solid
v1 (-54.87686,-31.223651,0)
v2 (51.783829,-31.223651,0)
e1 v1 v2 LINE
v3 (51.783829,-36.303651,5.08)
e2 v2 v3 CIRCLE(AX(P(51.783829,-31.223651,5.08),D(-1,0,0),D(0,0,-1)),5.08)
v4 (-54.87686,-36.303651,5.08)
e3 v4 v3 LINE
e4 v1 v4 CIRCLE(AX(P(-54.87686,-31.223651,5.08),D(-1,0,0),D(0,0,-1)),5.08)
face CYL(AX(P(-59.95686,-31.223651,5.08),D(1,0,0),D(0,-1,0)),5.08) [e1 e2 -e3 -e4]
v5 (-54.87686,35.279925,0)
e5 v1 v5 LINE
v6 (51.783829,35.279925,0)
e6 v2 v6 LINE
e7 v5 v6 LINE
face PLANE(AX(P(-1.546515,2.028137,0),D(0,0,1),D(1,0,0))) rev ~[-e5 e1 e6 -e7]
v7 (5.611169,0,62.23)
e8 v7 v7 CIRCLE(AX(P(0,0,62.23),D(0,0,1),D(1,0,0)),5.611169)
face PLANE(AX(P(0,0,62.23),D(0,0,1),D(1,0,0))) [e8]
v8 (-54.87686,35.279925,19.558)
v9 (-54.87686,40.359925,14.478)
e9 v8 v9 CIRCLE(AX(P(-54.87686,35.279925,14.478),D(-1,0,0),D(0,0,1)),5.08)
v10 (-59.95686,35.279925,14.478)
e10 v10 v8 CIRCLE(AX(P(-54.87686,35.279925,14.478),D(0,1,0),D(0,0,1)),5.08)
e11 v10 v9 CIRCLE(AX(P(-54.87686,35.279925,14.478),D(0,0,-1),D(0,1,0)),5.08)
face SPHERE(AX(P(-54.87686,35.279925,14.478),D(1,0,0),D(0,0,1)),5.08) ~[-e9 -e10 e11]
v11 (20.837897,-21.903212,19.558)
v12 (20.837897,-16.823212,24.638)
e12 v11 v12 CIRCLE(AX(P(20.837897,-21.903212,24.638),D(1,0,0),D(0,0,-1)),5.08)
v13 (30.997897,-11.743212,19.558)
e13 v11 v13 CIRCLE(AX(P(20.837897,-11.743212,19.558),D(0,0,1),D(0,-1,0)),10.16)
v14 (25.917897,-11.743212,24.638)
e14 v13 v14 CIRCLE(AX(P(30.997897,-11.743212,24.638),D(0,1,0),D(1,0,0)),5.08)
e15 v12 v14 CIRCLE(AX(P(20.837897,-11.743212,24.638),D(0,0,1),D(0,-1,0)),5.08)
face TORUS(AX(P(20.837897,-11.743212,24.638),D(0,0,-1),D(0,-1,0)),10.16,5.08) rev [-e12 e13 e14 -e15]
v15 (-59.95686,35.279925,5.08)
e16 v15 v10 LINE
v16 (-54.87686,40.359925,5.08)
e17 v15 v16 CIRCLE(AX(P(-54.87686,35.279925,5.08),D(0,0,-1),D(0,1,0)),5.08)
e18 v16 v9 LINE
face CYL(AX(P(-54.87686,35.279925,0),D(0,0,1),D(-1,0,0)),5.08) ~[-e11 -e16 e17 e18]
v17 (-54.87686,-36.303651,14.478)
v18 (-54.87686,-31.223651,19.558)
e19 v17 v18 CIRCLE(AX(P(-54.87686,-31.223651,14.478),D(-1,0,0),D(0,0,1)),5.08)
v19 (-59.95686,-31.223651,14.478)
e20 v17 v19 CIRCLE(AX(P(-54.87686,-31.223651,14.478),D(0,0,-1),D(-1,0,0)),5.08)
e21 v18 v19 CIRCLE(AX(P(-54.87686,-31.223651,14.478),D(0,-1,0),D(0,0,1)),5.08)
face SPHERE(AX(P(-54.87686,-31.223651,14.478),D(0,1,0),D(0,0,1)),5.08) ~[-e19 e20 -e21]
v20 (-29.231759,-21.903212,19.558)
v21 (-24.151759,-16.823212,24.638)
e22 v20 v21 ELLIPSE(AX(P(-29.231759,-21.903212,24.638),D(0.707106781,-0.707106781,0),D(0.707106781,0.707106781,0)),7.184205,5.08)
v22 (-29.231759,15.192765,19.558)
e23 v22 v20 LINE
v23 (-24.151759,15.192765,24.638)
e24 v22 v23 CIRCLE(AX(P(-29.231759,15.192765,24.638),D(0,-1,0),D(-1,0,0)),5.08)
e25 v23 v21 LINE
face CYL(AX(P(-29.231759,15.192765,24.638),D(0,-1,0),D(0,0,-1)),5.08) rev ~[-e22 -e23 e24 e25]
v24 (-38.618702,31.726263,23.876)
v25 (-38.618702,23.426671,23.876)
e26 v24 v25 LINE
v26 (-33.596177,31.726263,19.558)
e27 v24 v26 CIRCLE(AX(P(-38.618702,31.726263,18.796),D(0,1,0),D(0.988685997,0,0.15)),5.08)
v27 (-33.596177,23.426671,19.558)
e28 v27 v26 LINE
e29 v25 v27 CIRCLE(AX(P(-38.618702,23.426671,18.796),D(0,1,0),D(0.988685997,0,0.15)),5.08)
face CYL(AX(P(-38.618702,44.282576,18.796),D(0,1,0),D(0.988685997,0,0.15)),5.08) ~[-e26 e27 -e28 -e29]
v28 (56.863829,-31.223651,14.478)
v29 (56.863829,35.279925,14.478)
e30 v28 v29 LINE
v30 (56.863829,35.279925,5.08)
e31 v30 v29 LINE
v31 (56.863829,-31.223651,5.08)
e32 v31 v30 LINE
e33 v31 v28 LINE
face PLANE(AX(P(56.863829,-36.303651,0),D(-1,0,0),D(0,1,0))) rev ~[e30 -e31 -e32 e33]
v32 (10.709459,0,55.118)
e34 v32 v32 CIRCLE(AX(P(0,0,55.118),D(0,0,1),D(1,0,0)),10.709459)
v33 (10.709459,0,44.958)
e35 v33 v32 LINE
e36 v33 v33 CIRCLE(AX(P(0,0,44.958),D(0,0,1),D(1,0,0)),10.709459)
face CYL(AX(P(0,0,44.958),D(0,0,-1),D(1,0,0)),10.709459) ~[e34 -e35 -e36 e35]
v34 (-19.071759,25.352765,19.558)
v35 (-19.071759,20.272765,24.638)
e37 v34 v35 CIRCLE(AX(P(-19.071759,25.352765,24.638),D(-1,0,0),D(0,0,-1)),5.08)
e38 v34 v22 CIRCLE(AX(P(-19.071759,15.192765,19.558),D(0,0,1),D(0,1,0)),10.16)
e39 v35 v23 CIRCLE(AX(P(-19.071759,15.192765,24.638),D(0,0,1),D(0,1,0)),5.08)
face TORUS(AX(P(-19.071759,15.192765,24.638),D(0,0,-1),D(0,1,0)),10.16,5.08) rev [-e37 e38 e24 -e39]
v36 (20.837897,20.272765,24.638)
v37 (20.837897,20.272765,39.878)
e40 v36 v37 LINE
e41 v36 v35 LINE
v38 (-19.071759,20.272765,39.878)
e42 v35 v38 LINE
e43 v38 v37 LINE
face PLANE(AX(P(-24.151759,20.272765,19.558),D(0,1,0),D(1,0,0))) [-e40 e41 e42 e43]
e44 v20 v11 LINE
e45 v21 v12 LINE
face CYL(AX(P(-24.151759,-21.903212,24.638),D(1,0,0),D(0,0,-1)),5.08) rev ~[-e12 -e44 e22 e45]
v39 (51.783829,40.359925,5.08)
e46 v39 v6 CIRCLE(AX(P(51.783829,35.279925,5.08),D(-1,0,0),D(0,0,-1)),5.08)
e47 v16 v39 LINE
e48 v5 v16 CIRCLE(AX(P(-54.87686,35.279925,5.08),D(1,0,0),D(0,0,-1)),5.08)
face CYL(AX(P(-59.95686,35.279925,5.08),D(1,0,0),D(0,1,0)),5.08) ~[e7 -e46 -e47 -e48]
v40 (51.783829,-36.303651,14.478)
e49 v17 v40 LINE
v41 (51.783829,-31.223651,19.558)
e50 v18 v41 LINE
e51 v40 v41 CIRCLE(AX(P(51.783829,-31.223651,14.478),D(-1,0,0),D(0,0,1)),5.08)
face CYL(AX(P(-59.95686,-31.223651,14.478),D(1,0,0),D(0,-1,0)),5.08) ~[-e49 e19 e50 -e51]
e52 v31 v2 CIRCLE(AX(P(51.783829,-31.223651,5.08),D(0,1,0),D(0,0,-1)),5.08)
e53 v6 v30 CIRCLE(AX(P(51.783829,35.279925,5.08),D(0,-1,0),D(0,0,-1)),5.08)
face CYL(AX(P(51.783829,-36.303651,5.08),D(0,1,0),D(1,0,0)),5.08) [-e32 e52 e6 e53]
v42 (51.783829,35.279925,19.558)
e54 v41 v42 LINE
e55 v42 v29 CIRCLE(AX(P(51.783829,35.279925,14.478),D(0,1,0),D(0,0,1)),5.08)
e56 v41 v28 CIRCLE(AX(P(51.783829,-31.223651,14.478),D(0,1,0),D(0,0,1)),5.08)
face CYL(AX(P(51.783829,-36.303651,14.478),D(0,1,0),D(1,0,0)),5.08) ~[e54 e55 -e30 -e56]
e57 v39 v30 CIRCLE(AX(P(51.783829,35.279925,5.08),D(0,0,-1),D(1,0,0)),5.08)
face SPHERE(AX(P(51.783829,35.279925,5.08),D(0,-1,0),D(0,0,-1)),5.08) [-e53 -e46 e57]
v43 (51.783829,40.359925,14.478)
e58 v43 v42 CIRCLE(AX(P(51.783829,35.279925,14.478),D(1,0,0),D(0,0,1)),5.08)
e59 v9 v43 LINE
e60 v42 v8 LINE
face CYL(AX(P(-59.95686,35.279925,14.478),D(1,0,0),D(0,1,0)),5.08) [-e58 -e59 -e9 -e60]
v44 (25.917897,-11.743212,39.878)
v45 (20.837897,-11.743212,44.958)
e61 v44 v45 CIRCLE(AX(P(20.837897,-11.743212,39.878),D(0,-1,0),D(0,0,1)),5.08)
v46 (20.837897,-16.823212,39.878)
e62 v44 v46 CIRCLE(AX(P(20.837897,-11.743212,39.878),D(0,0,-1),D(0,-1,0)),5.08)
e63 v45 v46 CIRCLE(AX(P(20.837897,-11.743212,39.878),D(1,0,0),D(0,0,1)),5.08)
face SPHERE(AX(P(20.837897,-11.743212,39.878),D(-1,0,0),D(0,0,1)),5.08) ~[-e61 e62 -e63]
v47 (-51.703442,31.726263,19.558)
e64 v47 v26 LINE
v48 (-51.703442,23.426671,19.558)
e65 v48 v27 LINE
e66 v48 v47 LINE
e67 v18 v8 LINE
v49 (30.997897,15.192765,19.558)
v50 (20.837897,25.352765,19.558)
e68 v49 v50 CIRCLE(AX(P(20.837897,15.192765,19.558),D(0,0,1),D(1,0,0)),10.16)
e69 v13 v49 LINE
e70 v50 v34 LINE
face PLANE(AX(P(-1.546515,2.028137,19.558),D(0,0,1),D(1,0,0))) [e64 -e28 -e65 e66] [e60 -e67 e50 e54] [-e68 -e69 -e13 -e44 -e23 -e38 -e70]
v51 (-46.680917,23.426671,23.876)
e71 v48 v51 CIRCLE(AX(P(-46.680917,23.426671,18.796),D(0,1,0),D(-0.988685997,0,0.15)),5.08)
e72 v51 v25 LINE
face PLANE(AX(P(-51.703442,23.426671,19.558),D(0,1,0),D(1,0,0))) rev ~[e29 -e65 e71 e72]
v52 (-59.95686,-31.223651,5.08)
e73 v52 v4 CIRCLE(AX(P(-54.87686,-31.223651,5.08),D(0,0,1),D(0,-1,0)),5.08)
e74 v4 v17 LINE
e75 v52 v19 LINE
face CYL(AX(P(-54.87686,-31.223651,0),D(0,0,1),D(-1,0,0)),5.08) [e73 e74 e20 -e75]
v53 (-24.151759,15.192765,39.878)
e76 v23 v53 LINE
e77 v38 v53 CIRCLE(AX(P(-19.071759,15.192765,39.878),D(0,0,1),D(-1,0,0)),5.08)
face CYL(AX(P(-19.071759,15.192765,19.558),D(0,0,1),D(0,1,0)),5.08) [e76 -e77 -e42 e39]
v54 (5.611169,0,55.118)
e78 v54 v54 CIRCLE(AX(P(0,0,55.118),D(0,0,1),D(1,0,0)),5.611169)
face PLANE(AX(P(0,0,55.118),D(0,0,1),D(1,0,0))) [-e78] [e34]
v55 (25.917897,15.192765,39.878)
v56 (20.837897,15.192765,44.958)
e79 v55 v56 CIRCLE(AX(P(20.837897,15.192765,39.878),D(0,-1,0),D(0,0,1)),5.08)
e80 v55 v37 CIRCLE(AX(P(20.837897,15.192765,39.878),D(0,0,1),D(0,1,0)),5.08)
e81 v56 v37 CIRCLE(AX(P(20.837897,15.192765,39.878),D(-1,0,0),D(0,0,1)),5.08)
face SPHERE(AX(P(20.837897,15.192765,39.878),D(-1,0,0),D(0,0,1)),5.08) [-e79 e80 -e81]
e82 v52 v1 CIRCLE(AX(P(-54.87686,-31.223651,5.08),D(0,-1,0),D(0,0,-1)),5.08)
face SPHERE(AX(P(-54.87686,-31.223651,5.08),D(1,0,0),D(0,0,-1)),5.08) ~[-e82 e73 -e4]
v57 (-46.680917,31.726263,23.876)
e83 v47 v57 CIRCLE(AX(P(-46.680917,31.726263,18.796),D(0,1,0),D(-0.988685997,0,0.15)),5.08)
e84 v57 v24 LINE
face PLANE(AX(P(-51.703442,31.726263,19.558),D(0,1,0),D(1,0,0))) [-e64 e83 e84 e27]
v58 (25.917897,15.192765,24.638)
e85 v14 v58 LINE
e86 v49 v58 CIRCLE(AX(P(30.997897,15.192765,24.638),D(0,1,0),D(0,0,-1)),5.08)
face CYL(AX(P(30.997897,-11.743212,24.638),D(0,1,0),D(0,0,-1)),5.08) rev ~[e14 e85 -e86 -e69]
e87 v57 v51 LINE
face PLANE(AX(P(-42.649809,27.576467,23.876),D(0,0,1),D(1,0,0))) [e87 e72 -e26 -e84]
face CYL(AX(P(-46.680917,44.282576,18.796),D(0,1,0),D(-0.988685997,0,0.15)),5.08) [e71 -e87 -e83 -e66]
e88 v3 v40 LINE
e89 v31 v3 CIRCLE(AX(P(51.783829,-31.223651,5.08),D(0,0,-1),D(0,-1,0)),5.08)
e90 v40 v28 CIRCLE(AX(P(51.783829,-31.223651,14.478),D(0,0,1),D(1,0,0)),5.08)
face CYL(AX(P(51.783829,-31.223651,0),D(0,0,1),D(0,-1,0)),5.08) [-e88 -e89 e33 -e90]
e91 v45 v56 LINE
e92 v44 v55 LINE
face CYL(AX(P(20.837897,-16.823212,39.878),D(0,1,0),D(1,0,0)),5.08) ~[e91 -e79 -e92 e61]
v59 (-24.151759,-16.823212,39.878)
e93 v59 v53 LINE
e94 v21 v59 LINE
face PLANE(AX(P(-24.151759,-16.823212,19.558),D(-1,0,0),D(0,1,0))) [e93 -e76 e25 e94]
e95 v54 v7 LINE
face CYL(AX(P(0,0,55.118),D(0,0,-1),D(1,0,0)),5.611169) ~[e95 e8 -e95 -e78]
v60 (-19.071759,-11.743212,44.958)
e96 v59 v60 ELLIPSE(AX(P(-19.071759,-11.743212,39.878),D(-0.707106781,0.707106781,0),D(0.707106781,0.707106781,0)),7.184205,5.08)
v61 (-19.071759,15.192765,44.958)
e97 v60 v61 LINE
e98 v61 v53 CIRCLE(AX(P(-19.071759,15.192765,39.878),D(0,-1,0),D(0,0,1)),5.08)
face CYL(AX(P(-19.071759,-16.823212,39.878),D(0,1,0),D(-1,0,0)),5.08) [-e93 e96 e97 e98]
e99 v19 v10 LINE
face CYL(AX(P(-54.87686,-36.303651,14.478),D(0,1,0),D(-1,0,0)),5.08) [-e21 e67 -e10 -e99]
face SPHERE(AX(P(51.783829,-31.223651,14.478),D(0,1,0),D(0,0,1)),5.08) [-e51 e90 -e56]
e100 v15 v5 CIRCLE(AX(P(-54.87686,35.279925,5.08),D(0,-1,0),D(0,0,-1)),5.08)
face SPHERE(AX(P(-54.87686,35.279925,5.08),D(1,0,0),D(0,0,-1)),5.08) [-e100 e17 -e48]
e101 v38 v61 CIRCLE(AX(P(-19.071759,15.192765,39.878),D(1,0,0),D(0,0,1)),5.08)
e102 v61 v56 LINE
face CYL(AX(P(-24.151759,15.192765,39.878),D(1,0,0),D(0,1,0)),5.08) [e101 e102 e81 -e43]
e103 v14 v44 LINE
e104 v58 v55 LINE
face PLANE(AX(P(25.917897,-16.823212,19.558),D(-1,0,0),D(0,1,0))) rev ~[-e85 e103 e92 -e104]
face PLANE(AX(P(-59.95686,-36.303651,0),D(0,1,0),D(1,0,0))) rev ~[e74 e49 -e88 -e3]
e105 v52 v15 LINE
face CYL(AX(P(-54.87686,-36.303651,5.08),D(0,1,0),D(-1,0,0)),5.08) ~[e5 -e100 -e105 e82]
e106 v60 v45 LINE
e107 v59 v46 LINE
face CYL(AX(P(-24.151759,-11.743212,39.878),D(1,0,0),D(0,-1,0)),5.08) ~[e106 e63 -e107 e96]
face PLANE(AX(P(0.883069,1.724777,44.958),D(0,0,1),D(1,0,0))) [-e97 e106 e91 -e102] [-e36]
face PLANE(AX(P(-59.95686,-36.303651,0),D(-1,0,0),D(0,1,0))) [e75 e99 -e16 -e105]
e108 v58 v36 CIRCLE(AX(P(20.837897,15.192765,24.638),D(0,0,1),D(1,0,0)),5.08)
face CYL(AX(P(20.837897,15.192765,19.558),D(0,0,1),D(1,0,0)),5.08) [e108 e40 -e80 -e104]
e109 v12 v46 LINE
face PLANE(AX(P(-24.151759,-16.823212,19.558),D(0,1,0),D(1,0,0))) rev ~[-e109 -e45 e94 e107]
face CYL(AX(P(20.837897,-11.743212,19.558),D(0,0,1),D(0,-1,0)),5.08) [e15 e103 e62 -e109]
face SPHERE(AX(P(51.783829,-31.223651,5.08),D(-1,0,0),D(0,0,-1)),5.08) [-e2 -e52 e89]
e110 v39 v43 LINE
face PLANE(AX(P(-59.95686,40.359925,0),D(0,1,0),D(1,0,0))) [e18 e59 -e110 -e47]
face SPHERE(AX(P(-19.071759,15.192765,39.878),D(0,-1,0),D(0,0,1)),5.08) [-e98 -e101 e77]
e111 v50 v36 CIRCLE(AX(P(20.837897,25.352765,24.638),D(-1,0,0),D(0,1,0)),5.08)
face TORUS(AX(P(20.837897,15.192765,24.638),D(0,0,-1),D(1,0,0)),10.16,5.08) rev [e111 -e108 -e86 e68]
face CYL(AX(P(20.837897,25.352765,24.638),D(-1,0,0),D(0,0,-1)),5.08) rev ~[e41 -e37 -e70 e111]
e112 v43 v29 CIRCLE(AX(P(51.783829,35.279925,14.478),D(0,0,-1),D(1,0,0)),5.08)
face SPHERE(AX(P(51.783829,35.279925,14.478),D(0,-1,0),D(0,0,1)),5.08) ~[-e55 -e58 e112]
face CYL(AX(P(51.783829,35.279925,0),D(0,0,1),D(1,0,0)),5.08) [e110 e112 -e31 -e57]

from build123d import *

# Parameters (mm, degrees)
F0_W        = 116.8206892908
F0_H        = 76.6635760665
F1_DEPTH    = 19.558
F2_R        = 5.08
F3_W        = 50.0696562231
F3_H        = 37.0959769934
F4_DEPTH    = 25.4
F5_F1_R     = 5.08
F5_F2_R     = 5.08
F6_W        = 18.107265234
F6_H        = 8.2995928824
F7_DEPTH    = 4.318
F8_T1_DEPTH = 33.4122171977
F9_R        = 10.7094586845
F10_DEPTH   = 10.16
F11_R       = 5.6111694278
F12_DEPTH   = 7.112


# Not quite as in the source:
# - a fillet or chamfer that OpenCascade refuses, or shapes differently, is made with other operations: its cross-section is extruded or revolved along the edge and cut away or added


with BuildPart() as f1:
    # F0 (on Top) → F1 (new body)
    with BuildSketch(Plane.XY):
        with Locations((-1.5465151519, 2.0281374454)):
            Rectangle(F0_W, F0_H)
    extrude(amount=F1_DEPTH)

    # F2
    f2_edges = [f1.edges().sort_by_distance(p)[0] for p in [
        (56.863829, 2.028137, 19.558),
        (-1.546515, 40.359925, 19.558),
        (-59.95686, 2.028137, 19.558),
        (-1.546515, -36.303651, 19.558),
        (-1.546515, -36.303651, 0),
        (56.863829, 2.028137, 0),
        (-1.546515, 40.359925, 0),
        (-59.95686, 2.028137, 0),
        (-59.95686, 40.359925, 9.779),
        (-59.95686, -36.303651, 9.779),
        (56.863829, 40.359925, 9.779),
        (56.863829, -36.303651, 9.779),
    ]]
    fillet(f2_edges, radius=F2_R)

    # F3 (on face) → F4 (join)
    with BuildSketch(Plane.XY.offset(19.558)):
        with Locations((0.8830688894, 1.7247768119)):
            Rectangle(F3_W, F3_H)
    extrude(amount=F4_DEPTH)

    # F5: fillet of radius 5.08 on 10 edges, made by hand

    # F5_f1
    f5_f1_edges = [f1.edges().sort_by_distance(p)[0] for p in [
        (0.8830688894, -16.8232116848, 44.958),
        (-24.1517592221, 1.7247768119, 44.958),
        (0.8830688894, 20.2727653086, 44.958),
        (25.9178970009, 1.7247768119, 44.958),
        (25.9178970009, -16.8232116848, 32.258),
        (25.9178970009, 20.2727653086, 32.258),
        (-24.1517592221, 20.2727653086, 32.258),
    ]]
    fillet(f5_f1_edges, radius=F5_F1_R)

    # F5_f2
    f5_f2_edges = [f1.edges().sort_by_distance(p)[0] for p in [
        (25.9178970009, 1.7247768119, 19.558),
        (-24.1517592221, -0.8152231881, 19.558),
        (0.8830688894, 20.2727653086, 19.558),
        (24.4299994493, 18.784867757, 19.558),
        (-22.6638616706, 18.784867757, 19.558),
        (24.4299994493, -15.3353141333, 19.558),
    ]]
    fillet(f5_f2_edges, radius=F5_F2_R)

    # F6 (on face) → F7 (join)
    with BuildSketch(Plane.XY.offset(19.558)):
        with Locations((-42.6498092711, 27.5764670223)):
            Rectangle(F6_W, F6_H)
    extrude(amount=F7_DEPTH)

    # F8: fillet of radius 5.08 on 2 edges, made by hand

    # F8_s2 → F8_t1 (cut)
    with BuildSketch(Plane.XZ.offset(-44.2825756211)):
        with BuildLine():
            ThreePointArc((-51.7034418881, 19.558), (-49.9926718469, 22.6481007256), (-46.680917025, 23.876))
            Line((-46.680917025, 23.876), (-51.7034418881, 23.876))
            Line((-51.7034418881, 23.876), (-51.7034418881, 19.558))
        make_face()
        with BuildLine():
            ThreePointArc((-33.5961766541, 19.558), (-35.3069466953, 22.6481007256), (-38.6187015172, 23.876))
            Line((-38.6187015172, 23.876), (-33.5961766541, 23.876))
            Line((-33.5961766541, 23.876), (-33.5961766541, 19.558))
        make_face()
    extrude(amount=F8_T1_DEPTH, mode=Mode.SUBTRACT)

    # F9 (on face) → F10 (join)
    with BuildSketch(Plane.XY.offset(44.958)):
        Circle(F9_R)
    extrude(amount=F10_DEPTH)

    # F11 (on face) → F12 (join)
    with BuildSketch(Plane.XY.offset(55.118)):
        Circle(F11_R)
    extrude(amount=F12_DEPTH)


solid = f1.part
